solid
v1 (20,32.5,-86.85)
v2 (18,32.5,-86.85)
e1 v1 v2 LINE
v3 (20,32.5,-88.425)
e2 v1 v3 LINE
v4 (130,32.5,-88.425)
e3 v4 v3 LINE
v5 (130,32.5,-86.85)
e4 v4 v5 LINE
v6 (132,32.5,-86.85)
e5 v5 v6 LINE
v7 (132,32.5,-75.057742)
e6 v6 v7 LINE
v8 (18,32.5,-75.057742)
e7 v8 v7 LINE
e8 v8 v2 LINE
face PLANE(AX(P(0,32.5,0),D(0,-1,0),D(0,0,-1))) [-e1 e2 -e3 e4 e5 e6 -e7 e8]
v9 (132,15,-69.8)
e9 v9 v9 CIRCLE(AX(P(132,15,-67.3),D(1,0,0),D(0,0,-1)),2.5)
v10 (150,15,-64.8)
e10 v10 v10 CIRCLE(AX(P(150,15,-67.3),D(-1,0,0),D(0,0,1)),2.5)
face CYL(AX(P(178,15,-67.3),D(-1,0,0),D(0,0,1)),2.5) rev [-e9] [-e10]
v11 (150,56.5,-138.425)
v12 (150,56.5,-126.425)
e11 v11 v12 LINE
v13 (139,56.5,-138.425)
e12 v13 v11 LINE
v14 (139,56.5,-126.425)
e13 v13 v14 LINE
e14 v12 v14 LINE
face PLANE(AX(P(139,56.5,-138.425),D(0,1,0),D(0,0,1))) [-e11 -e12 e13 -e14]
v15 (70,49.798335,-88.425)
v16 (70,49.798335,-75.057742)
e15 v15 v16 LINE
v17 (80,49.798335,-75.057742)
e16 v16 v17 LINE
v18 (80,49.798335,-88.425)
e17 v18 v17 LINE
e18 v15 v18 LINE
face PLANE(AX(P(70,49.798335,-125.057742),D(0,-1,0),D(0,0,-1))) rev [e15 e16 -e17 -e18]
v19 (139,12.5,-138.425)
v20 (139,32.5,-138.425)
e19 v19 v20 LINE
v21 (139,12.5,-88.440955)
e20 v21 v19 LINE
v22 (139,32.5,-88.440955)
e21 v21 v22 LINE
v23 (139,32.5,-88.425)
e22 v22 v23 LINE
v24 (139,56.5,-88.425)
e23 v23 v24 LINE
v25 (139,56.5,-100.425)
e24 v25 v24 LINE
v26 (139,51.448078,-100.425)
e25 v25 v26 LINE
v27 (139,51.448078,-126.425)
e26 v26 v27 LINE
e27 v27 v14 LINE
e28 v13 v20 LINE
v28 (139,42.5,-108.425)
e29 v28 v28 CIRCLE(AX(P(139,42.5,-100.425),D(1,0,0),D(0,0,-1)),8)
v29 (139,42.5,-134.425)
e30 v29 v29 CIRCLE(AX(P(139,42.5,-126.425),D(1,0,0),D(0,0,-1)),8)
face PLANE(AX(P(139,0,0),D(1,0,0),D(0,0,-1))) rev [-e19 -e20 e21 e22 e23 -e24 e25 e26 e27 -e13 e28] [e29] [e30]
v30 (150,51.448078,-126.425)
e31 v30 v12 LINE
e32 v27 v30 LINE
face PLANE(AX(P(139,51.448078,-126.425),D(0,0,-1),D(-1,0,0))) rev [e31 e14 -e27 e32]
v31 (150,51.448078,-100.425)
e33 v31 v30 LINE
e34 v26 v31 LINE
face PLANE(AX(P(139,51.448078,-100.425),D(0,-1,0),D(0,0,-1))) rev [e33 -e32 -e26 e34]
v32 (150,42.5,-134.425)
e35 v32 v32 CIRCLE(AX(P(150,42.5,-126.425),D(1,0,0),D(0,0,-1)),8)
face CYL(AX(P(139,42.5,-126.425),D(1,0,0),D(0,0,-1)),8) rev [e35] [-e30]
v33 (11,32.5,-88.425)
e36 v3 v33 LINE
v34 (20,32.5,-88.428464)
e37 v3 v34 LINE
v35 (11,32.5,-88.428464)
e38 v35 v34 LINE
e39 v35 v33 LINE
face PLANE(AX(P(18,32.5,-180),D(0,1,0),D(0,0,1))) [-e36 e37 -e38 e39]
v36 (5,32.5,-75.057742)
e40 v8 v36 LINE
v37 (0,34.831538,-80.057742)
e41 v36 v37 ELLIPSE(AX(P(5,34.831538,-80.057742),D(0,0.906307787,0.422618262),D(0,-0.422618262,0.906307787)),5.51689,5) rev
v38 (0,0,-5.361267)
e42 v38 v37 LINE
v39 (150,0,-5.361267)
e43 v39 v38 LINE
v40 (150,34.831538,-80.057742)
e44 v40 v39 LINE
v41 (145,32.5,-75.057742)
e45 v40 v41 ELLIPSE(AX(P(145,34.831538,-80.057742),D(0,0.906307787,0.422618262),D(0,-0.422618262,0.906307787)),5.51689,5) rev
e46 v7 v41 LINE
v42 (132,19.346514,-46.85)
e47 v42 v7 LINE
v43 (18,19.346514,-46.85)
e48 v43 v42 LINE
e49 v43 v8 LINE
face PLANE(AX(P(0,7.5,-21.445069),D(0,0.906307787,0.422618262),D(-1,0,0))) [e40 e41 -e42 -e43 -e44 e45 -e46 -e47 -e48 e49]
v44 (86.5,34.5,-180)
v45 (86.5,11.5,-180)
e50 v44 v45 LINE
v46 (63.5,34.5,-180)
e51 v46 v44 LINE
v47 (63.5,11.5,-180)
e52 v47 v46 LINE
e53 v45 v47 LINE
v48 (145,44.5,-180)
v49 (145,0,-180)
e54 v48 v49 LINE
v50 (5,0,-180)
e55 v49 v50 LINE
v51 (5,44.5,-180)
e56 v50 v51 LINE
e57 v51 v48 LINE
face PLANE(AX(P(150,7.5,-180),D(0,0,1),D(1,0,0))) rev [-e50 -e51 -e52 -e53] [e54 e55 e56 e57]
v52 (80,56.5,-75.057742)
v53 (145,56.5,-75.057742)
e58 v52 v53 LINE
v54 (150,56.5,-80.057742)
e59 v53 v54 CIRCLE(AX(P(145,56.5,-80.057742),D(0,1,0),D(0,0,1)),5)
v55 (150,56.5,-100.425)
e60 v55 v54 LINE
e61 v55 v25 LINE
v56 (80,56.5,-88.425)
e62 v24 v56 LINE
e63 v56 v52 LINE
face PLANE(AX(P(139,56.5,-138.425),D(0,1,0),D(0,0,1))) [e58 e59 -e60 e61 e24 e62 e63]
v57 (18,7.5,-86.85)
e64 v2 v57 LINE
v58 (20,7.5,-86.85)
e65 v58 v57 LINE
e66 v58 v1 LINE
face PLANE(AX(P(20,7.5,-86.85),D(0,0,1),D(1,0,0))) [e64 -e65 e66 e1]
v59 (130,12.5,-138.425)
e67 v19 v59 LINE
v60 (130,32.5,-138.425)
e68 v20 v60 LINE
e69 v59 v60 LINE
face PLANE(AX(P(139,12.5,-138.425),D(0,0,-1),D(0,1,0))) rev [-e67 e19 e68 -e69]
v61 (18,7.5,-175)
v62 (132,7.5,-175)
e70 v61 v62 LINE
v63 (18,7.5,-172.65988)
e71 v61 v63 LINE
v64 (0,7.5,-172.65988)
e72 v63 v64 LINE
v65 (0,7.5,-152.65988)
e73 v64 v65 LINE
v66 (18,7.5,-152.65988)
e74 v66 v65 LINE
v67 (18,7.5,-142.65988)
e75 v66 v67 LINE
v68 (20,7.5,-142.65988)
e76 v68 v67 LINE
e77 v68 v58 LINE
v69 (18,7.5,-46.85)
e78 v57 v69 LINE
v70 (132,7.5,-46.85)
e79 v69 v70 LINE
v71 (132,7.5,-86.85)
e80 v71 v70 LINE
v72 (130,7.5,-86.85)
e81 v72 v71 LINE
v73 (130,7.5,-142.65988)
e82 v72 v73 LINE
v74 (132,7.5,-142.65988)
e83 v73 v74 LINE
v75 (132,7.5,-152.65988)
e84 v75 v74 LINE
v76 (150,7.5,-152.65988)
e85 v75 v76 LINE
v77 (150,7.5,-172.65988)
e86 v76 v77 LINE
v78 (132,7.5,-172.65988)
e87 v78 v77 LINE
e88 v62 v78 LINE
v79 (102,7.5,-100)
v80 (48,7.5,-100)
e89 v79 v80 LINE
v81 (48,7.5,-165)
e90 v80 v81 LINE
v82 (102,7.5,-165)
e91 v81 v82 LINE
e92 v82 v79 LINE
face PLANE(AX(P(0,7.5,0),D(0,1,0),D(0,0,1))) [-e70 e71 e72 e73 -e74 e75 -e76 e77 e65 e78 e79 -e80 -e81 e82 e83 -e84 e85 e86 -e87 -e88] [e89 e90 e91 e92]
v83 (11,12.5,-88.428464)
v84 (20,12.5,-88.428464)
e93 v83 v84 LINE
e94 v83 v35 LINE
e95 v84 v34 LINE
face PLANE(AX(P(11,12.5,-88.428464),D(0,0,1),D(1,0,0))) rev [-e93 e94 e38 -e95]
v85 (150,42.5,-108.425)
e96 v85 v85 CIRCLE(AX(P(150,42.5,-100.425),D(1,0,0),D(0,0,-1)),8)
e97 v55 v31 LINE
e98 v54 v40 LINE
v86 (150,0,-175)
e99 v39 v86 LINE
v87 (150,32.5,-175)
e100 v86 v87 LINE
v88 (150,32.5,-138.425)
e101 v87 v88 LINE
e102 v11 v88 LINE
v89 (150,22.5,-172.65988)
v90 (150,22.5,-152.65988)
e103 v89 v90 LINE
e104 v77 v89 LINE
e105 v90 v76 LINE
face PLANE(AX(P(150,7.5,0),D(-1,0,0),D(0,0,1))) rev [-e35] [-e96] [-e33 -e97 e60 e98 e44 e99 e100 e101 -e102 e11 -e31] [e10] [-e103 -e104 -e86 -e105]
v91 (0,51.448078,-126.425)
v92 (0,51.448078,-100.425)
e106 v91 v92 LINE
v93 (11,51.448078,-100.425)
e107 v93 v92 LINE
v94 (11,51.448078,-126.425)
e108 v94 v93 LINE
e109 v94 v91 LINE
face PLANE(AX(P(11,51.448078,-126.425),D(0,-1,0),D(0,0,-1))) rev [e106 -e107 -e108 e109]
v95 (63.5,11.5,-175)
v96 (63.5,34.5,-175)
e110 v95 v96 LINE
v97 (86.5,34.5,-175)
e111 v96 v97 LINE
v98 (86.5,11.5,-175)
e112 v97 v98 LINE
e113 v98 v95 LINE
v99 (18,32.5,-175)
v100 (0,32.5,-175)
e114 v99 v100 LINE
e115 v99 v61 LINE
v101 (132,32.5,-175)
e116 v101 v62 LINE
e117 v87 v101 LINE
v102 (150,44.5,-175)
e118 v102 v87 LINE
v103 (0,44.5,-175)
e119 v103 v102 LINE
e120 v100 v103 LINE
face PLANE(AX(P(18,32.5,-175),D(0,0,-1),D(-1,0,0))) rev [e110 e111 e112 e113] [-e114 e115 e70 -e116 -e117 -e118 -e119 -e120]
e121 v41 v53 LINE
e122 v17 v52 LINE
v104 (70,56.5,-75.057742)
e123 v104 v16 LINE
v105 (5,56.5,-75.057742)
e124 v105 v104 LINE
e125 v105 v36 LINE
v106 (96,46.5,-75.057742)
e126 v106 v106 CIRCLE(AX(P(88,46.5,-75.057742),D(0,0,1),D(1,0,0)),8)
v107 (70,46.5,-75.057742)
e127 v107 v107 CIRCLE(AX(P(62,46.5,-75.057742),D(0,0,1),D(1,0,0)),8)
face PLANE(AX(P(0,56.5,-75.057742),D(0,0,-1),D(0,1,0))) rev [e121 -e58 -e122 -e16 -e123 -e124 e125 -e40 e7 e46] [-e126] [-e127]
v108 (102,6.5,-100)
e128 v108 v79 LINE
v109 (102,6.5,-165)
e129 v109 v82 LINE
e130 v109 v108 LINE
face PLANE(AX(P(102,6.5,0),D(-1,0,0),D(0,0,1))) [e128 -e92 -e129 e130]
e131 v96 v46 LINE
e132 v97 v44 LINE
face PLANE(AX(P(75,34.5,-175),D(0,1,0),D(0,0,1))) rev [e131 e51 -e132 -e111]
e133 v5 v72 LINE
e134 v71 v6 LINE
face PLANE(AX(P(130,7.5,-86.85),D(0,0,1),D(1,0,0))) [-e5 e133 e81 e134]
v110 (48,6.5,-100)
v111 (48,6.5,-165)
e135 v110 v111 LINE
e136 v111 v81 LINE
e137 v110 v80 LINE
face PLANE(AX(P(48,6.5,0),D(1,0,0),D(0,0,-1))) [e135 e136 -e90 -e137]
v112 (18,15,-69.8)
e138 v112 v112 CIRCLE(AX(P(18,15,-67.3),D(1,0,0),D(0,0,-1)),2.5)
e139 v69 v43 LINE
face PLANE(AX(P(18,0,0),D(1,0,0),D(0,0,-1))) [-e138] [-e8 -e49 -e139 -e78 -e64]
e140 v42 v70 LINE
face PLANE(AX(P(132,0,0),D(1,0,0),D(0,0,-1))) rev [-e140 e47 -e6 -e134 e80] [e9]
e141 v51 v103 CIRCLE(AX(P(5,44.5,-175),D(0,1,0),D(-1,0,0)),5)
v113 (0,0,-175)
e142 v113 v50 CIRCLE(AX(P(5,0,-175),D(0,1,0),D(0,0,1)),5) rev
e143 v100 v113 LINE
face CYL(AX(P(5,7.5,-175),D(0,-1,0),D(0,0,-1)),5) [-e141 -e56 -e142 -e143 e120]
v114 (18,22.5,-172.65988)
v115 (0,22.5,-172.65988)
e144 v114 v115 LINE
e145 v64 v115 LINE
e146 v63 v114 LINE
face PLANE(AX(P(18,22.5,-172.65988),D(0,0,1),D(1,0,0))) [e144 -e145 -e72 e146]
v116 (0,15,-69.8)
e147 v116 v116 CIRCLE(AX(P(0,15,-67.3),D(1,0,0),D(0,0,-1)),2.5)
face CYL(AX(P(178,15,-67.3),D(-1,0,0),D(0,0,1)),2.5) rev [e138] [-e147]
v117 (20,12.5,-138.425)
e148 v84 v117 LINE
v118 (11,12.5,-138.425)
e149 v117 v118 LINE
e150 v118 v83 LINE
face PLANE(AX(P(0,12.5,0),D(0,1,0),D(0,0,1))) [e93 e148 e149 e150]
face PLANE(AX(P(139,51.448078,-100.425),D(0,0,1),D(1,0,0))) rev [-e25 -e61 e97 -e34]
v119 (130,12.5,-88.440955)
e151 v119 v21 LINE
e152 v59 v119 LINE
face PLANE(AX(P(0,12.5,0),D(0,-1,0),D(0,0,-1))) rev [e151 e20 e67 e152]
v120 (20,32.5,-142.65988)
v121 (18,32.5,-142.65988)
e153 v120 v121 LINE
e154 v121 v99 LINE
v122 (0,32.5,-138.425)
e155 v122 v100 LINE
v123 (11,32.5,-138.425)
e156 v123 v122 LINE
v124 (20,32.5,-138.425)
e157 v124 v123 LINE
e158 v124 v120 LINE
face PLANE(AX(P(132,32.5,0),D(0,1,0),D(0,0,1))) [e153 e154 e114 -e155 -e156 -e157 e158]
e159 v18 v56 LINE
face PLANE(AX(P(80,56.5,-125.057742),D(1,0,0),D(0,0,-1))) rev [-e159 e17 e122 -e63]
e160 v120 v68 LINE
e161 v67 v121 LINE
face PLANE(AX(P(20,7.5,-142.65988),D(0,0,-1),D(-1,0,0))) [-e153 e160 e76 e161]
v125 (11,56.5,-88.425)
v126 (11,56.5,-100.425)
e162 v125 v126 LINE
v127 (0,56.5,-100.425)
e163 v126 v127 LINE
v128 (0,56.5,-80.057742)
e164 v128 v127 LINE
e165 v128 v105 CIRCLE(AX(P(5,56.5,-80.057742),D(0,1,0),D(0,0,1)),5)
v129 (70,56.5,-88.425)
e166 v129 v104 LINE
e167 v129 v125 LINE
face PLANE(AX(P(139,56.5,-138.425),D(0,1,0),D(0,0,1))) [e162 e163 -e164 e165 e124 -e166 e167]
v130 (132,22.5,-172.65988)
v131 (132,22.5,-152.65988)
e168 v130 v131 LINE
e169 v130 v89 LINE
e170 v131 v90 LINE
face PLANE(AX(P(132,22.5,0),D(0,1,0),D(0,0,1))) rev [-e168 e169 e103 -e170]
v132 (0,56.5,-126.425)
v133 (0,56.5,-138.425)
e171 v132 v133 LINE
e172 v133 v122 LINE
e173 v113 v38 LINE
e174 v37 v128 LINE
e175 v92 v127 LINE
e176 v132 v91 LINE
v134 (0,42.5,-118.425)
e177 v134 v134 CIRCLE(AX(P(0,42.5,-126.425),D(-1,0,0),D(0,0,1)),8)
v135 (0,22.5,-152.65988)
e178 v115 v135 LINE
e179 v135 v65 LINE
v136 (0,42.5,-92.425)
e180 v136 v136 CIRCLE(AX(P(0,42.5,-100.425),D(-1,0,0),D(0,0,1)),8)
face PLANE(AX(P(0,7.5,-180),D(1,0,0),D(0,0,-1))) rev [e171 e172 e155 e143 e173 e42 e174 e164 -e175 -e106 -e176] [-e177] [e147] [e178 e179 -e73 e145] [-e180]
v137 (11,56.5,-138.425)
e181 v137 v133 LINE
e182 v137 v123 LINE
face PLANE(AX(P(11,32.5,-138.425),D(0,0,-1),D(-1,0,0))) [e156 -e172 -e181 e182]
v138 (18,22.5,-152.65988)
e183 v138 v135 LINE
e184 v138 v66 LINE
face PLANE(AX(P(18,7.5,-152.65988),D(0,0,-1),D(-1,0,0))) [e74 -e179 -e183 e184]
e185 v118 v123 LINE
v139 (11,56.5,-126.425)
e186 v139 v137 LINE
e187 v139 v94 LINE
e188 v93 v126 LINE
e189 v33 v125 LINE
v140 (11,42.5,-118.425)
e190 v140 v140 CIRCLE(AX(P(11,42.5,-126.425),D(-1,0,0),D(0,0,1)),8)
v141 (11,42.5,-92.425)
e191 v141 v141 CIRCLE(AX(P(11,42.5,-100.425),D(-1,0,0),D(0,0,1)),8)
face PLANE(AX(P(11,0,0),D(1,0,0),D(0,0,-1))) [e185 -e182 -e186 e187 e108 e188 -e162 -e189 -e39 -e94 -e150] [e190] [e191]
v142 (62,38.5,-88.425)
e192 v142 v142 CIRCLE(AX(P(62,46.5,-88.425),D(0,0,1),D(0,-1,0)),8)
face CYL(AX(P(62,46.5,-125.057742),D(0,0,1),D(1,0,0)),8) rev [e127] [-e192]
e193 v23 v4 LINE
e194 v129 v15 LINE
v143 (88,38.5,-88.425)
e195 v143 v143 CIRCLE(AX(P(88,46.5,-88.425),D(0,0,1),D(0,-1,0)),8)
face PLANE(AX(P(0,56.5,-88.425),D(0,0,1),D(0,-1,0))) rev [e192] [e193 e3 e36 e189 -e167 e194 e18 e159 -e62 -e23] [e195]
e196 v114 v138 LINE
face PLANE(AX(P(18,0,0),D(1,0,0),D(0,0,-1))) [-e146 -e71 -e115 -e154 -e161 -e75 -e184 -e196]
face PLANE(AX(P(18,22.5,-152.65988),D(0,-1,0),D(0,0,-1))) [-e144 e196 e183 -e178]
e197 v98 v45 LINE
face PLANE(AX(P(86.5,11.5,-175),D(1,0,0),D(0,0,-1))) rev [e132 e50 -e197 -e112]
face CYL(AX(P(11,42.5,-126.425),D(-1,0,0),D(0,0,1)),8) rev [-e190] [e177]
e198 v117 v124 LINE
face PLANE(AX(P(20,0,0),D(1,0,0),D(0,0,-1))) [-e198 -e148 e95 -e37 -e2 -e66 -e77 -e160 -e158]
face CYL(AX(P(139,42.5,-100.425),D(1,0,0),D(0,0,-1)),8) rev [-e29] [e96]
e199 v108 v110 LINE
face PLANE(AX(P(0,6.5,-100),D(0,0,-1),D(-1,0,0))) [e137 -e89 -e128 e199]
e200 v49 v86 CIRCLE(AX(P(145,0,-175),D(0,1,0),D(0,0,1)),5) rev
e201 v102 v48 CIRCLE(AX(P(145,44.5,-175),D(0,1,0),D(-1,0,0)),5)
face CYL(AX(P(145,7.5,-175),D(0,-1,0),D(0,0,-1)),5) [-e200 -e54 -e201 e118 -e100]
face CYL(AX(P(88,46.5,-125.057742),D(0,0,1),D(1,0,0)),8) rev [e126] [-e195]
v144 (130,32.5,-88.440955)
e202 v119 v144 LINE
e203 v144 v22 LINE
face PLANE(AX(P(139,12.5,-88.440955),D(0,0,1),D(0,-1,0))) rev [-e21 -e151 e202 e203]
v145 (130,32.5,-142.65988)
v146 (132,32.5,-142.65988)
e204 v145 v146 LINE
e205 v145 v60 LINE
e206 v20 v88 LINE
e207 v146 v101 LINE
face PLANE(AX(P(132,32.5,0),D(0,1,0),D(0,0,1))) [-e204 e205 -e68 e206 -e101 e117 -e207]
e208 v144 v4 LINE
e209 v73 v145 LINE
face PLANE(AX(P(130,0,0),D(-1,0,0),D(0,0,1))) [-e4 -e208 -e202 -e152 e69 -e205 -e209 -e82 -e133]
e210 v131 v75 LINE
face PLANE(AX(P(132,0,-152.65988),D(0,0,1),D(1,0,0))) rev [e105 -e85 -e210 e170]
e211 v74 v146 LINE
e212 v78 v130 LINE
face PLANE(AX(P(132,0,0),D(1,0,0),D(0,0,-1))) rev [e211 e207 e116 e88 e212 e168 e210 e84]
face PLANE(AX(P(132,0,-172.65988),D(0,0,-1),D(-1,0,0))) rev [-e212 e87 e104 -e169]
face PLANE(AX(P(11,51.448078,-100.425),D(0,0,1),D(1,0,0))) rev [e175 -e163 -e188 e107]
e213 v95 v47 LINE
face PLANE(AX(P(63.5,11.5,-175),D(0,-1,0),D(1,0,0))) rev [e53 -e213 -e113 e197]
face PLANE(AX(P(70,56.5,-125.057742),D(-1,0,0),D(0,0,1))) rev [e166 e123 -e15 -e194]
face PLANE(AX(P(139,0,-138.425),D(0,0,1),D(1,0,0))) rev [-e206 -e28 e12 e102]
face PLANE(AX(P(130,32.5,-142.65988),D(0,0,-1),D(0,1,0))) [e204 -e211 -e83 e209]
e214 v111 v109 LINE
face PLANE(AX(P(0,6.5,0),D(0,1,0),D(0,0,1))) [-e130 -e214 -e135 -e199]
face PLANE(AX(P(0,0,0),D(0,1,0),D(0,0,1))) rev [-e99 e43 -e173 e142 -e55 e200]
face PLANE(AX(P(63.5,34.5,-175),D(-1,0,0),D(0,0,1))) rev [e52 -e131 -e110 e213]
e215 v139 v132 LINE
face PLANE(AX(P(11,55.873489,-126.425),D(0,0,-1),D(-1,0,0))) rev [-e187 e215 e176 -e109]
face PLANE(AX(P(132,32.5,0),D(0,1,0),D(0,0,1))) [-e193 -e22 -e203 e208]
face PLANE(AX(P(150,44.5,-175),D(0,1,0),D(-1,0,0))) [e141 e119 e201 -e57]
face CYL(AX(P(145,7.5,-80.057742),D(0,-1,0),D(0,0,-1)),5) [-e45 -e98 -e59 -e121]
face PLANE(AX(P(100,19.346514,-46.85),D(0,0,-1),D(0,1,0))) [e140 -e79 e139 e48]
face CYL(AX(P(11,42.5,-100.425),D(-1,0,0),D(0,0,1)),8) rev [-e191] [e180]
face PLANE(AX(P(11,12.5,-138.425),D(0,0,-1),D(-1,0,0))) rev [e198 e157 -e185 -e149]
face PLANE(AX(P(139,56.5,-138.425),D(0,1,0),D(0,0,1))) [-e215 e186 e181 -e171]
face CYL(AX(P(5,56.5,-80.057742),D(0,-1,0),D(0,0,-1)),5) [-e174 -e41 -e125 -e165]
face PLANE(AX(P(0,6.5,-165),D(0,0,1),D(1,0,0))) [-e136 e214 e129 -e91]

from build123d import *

# Parameters (mm, degrees)
SKETCH1_W                = 150
SKETCH1_H                = 180
BOSS_EXTRUDE2_DEPTH      = 7.5
BOSS_EXTRUDE4_DEPTH      = 18
BOSS_EXTRUDE5_DEPTH      = 18
SKETCH6_W                = 20
SKETCH6_H                = 15
BOSS_EXTRUDE7_DEPTH      = 18
BOSS_EXTRUDE8_DEPTH      = 22
BOSS_EXTRUDE8_DEPTH_BACK = 172
SKETCH7_R                = 2.5
SKETCH8_W                = 20
SKETCH8_H                = 15
BOSS_EXTRUDE9_DEPTH      = 18
SKETCH9_W                = 55.809879822
SKETCH9_H                = 25
BOSS_EXTRUDE10_DEPTH     = 20
SKETCH10_W               = 55.809879822
SKETCH10_H               = 25
BOSS_EXTRUDE11_DEPTH     = 20
CHAMFER2_SIZE            = 10
CHAMFER2_SIZE_2          = 21.445069205
SKETCH12_R               = 8
BOSS_EXTRUDE12_DEPTH     = 11
SKETCH13_W               = 50
SKETCH13_H               = 2
BOSS_EXTRUDE13_DEPTH     = 11
SKETCH14_W               = 26
SKETCH14_H               = 4.425411463
CUT_EXTRUDE1_DEPTH       = 11
SKETCH15_W               = 9
SKETCH15_H               = 49.984045424
CUT_EXTRUDE2_DEPTH       = 20
BOSS_EXTRUDE14_START     = -11
SKETCH16_W               = 50
SKETCH16_H               = 24
SKETCH16_R               = 8
SKETCH16_W_2             = 26
SKETCH16_H_2             = 4.425411463
BOSS_EXTRUDE14_DEPTH     = 11
SKETCH17_W               = 9
SKETCH17_H               = 49.996535525
CUT_EXTRUDE3_DEPTH       = 20
SKETCH20_W               = 114
SKETCH20_H               = 5
BOSS_EXTRUDE15_DEPTH     = 25
CUT_EXTRUDE4_DEPTH       = 1
CUT_EXTRUDE5_DEPTH       = 20
BOSS_EXTRUDE16_DEPTH     = 50
CUT_EXTRUDE6_DEPTH       = 50
BOSS_EXTRUDE17_DEPTH     = 50
SKETCH27_W               = 150
SKETCH27_H               = 12
BOSS_EXTRUDE18_DEPTH     = 5
CUT_EXTRUDE7_DEPTH       = 5
SKETCH29_W               = 150
SKETCH29_H               = 13.367257782
BOSS_EXTRUDE19_DEPTH     = 24
SKETCH30_W               = 50
SKETCH30_H               = 25.404930795
BOSS_EXTRUDE20_DEPTH     = 12
CUT_EXTRUDE10_DEPTH      = 50
SKETCH32_R               = 8
CUT_EXTRUDE13_DEPTH      = 50
SKETCH33_W               = 10
SKETCH33_H               = 6.701665097
CUT_EXTRUDE14_DEPTH      = 50
FILLET1_R                = 5
FILLET2_R                = 5
FILLET3_R                = 5
FILLET4_R                = 5
CUT_EXTRUDE15_START      = -200
SKETCH34_R               = 2.5
CUT_EXTRUDE15_DEPTH      = 200
CUT_EXTRUDE16_DEPTH      = 200
CUT_EXTRUDE17_DEPTH      = 200


with BuildPart() as part:
    # Sketch1 → Boss-Extrude2 (new body)
    with BuildSketch(Plane(origin=(0, 0, 0), x_dir=(1, 0, 0), z_dir=(0, 1, 0))):
        with Locations((75, 90)):
            Rectangle(SKETCH1_W, SKETCH1_H)
    extrude(amount=BOSS_EXTRUDE2_DEPTH)

    # Sketch2 → Boss-Extrude4 (add)
    with BuildSketch(Plane(origin=(150, 0, 0), x_dir=(0, 0, -1), z_dir=(1, 0, 0))):
        Polygon((76.85, 7.5), (86.85, 7.5), (86.85, 32.5), (46.85, 32.5), (46.85, 7.5), (50, 7.5), (56.85, 7.5), (56.85, 22.5), (76.85, 22.5), align=None)
        Polygon((172.659879822, 7.5), (180, 7.5), (180, 32.5), (142.659879822, 32.5), (142.659879822, 7.5), (152.659879822, 7.5), (152.659879822, 22.5), (172.659879822, 22.5), align=None)
    extrude(amount=-BOSS_EXTRUDE4_DEPTH)

    # Sketch4 → Boss-Extrude5 (add)
    with BuildSketch(Plane.ZY):
        Polygon((-180, 7.5), (-180, 32.5), (-142.659879822, 32.5), (-142.659879822, 7.5), (-152.659879822, 7.5), (-152.659879822, 22.5), (-172.659879822, 22.5), (-172.659879822, 7.5), align=None)
        Polygon((-86.85, 7.5), (-86.85, 32.5), (-46.85, 32.5), (-46.85, 7.5), (-56.85, 7.5), (-56.85, 22.5), (-76.85, 22.5), (-76.85, 7.5), align=None)
    extrude(amount=-BOSS_EXTRUDE5_DEPTH)

    # Sketch6 → Boss-Extrude7 (add)
    with BuildSketch(Plane(origin=(150, 0, 0), x_dir=(0, 0, -1), z_dir=(1, 0, 0))):
        with Locations((66.85, 15)):
            Rectangle(SKETCH6_W, SKETCH6_H)
    extrude(amount=-BOSS_EXTRUDE7_DEPTH)

    # Sketch7 → Boss-Extrude8 (add, two sides: drawn at the far end of the back side and taken through both)
    with BuildSketch(Plane(origin=(150, 0, 0), x_dir=(0, 0, -1), z_dir=(1, 0, 0)).offset(-BOSS_EXTRUDE8_DEPTH_BACK)):
        with Locations((67.3, 15)):
            Circle(SKETCH7_R)
    extrude(amount=BOSS_EXTRUDE8_DEPTH + BOSS_EXTRUDE8_DEPTH_BACK)

    # Sketch8 → Boss-Extrude9 (add)
    with BuildSketch(Plane.ZY):
        with Locations((-66.85, 15)):
            Rectangle(SKETCH8_W, SKETCH8_H)
    extrude(amount=-BOSS_EXTRUDE9_DEPTH)

    # Sketch9 → Boss-Extrude10 (add)
    with BuildSketch(Plane(origin=(150, 0, 0), x_dir=(0, 0, -1), z_dir=(1, 0, 0))):
        with Locations((114.754939911, 20)):
            Rectangle(SKETCH9_W, SKETCH9_H)
    extrude(amount=-BOSS_EXTRUDE10_DEPTH)

    # Sketch10 → Boss-Extrude11 (add)
    with BuildSketch(Plane.ZY):
        with Locations((-114.754939911, 20)):
            Rectangle(SKETCH10_W, SKETCH10_H)
    extrude(amount=-BOSS_EXTRUDE11_DEPTH)

    # Chamfer2
    # the kernel refuses this chamfer: 21.445069205, 10 mm, written as the material it takes off along each edge
    with BuildSketch(Plane(origin=(-55.563648293, 7.5, 0), x_dir=(0, -0.9971975577536774, 0.07481330637060031), z_dir=(1, 0, 0))) as chamfer2_piece_1:
        Polygon((CHAMFER2_SIZE * 0.997197557754, CHAMFER2_SIZE * 0.0748133063706), (-CHAMFER2_SIZE_2 * 0.0748133063709, CHAMFER2_SIZE_2 * 0.997197557758), (0, 0), align=None)
    extrude(amount=261.127296587, mode=Mode.SUBTRACT)

    # Sketch12 → Boss-Extrude12 (add)
    with BuildSketch(Plane(origin=(150, 0, 0), x_dir=(0, 0, -1), z_dir=(1, 0, 0))):
        Polygon((100.425, 32.5), (113.425, 32.5), (126.425, 32.5), (138.425, 32.5), (138.425, 42.5), (138.425, 54.5), (88.425, 54.5), (88.425, 42.5), (88.425, 32.5), align=None)
        with Locations((100.425, 42.5)):
            Circle(SKETCH12_R, mode=Mode.SUBTRACT)
        with Locations((126.425, 42.5)):
            Circle(SKETCH12_R, mode=Mode.SUBTRACT)
    extrude(amount=-BOSS_EXTRUDE12_DEPTH)

    # Sketch13 → Boss-Extrude13 (add)
    with BuildSketch(Plane(origin=(150, 0, 0), x_dir=(0, 0, -1), z_dir=(1, 0, 0))):
        with Locations((113.425, 55.5)):
            Rectangle(SKETCH13_W, SKETCH13_H)
    extrude(amount=-BOSS_EXTRUDE13_DEPTH)

    # Sketch14 → Cut-Extrude1 (cut)
    with BuildSketch(Plane(origin=(150, 0, 0), x_dir=(0, 0, -1), z_dir=(1, 0, 0))):
        with Locations((113.425, 53.660783617)):
            Rectangle(SKETCH14_W, SKETCH14_H)
    extrude(amount=-CUT_EXTRUDE1_DEPTH, mode=Mode.SUBTRACT)

    # Sketch15 → Cut-Extrude2 (cut)
    with BuildSketch(Plane(origin=(0, 32.5, 0), x_dir=(1, 0, 0), z_dir=(0, 1, 0))):
        with Locations((134.5, 113.432977288)):
            Rectangle(SKETCH15_W, SKETCH15_H)
    extrude(amount=-CUT_EXTRUDE2_DEPTH, mode=Mode.SUBTRACT)

    # Sketch16 → Boss-Extrude14 (add)
    with BuildSketch(Plane.ZY.offset(BOSS_EXTRUDE14_START)):
        with Locations((-113.425, 44.5)):
            Rectangle(SKETCH16_W, SKETCH16_H)
        with Locations(Location((-126.425, 42.5, 0), (0, 0, 180))):
            Circle(SKETCH16_R, mode=Mode.SUBTRACT)
        with Locations(Location((-100.425, 42.5, 0), (0, 0, 180))):
            Circle(SKETCH16_R, mode=Mode.SUBTRACT)
        with Locations((-113.425, 53.660783617)):
            Rectangle(SKETCH16_W_2, SKETCH16_H_2, mode=Mode.SUBTRACT)
    extrude(amount=BOSS_EXTRUDE14_DEPTH)

    # Sketch17 → Cut-Extrude3 (cut)
    with BuildSketch(Plane(origin=(0, 32.5, 0), x_dir=(1, 0, 0), z_dir=(0, 1, 0))):
        with Locations((15.5, 113.426732238)):
            Rectangle(SKETCH17_W, SKETCH17_H)
    extrude(amount=-CUT_EXTRUDE3_DEPTH, mode=Mode.SUBTRACT)

    # Sketch20 → Boss-Extrude15 (add)
    with BuildSketch(Plane(origin=(0, 7.5, 0), x_dir=(1, 0, 0), z_dir=(0, 1, 0))):
        with Locations((75, 177.5)):
            Rectangle(SKETCH20_W, SKETCH20_H)
    extrude(amount=BOSS_EXTRUDE15_DEPTH)

    # Sketch21 → Cut-Extrude4 (cut)
    with BuildSketch(Plane(origin=(0, 7.5, 0), x_dir=(1, 0, 0), z_dir=(0, 1, 0))):
        Polygon((48, 165), (75, 165), (102, 165), (102, 100), (48, 100), align=None)
    extrude(amount=-CUT_EXTRUDE4_DEPTH, mode=Mode.SUBTRACT)

    # Sketch22 → Cut-Extrude5 (cut)
    with BuildSketch(Plane(origin=(150, 0, 0), x_dir=(0, 0, -1), z_dir=(1, 0, 0))):
        Polygon((21.445069205, 7.5), (46.85, 19.346513785), (75.057742218, 32.5), (21.445069205, 32.5), align=None)
    extrude(amount=-CUT_EXTRUDE5_DEPTH, mode=Mode.SUBTRACT)

    # Sketch23 → Boss-Extrude16 (add)
    with BuildSketch(Plane(origin=(150, 0, 0), x_dir=(0, 0, -1), z_dir=(1, 0, 0))):
        Polygon((21.445069205, 7.5), (46.85, 19.346513785), (46.85, 7.5), align=None)
    extrude(amount=-BOSS_EXTRUDE16_DEPTH)

    # Sketch24 → Cut-Extrude6 (cut)
    with BuildSketch(Plane.ZY):
        Polygon((-21.445069205, 7.5), (-75.057742218, 32.5), (-21.445069205, 32.5), align=None)
    extrude(amount=-CUT_EXTRUDE6_DEPTH, mode=Mode.SUBTRACT)

    # Sketch25 → Boss-Extrude17 (add)
    with BuildSketch(Plane.ZY):
        Polygon((-46.85, 19.346513785), (-46.85, 7.5), (-21.445069205, 7.5), align=None)
    extrude(amount=-BOSS_EXTRUDE17_DEPTH)

    # Sketch27 → Boss-Extrude18 (add)
    with BuildSketch(Plane(origin=(0, 0, -180), x_dir=(-1, 0, 0), z_dir=(0, 0, -1))):
        with Locations((-75, 38.5)):
            Rectangle(SKETCH27_W, SKETCH27_H)
    extrude(amount=-BOSS_EXTRUDE18_DEPTH)

    # Sketch28 → Cut-Extrude7 (cut)
    with BuildSketch(Plane(origin=(0, 0, -180), x_dir=(-1, 0, 0), z_dir=(0, 0, -1))):
        Polygon((-75, 34.5), (-63.5, 34.5), (-63.5, 11.5), (-86.5, 11.5), (-86.5, 34.5), align=None)
    extrude(amount=-CUT_EXTRUDE7_DEPTH, mode=Mode.SUBTRACT)

    # Sketch29 → Boss-Extrude19 (add)
    with BuildSketch(Plane(origin=(0, 32.5, 0), x_dir=(1, 0, 0), z_dir=(0, 1, 0))):
        with Locations((75, 81.741371109)):
            Rectangle(SKETCH29_W, SKETCH29_H)
    extrude(amount=BOSS_EXTRUDE19_DEPTH)

    # Sketch30 → Boss-Extrude20 (add)
    with BuildSketch(Plane(origin=(0, 7.5, 0), x_dir=(1, 0, 0), z_dir=(0, 1, 0))):
        with Locations((75, 34.147534603)):
            Rectangle(SKETCH30_W, SKETCH30_H)
    extrude(amount=BOSS_EXTRUDE20_DEPTH)

    # Sketch31 → Cut-Extrude10 (cut)
    with BuildSketch(Plane(origin=(100, 0, 0), x_dir=(0, 0, -1), z_dir=(1, 0, 0))):
        Polygon((48.364168982, 20.052582377), (21.328861381, 20.052582377), (21.445069205, 7.5), align=None)
    extrude(amount=-CUT_EXTRUDE10_DEPTH, mode=Mode.SUBTRACT)

    # Sketch32 → Cut-Extrude13 (cut)
    with BuildSketch(Plane.XY.offset(-75.057742218)):
        with Locations((62, 46.5)):
            Circle(SKETCH32_R)
        with Locations((88, 46.5)):
            Circle(SKETCH32_R)
    extrude(amount=-CUT_EXTRUDE13_DEPTH, mode=Mode.SUBTRACT)

    # Sketch33 → Cut-Extrude14 (cut)
    with BuildSketch(Plane.XY.offset(-75.057742218)):
        with Locations((75, 53.149167452)):
            Rectangle(SKETCH33_W, SKETCH33_H)
    extrude(amount=-CUT_EXTRUDE14_DEPTH, mode=Mode.SUBTRACT)

    # Fillet1
    fillet1_edges = [part.edges().sort_by_distance(p)[0] for p in [
        (0, 44.5, -75.057742218),
    ]]
    fillet(fillet1_edges, radius=FILLET1_R)

    # Fillet2
    fillet2_edges = [part.edges().sort_by_distance(p)[0] for p in [
        (150, 44.5, -75.057742218),
    ]]
    fillet(fillet2_edges, radius=FILLET2_R)

    # Fillet3
    fillet3_edges = [part.edges().sort_by_distance(p)[0] for p in [
        (150, 22.25, -180),
    ]]
    fillet(fillet3_edges, radius=FILLET3_R)

    # Fillet4
    fillet4_edges = [part.edges().sort_by_distance(p)[0] for p in [
        (0, 22.25, -180),
    ]]
    fillet(fillet4_edges, radius=FILLET4_R)

    # Sketch34 → Cut-Extrude15 (cut)
    with BuildSketch(Plane.ZY.offset(22).offset(CUT_EXTRUDE15_START)):
        with Locations(Location((-67.3, 15, 0), (0, 0, 180))):
            Circle(SKETCH34_R)
    extrude(amount=CUT_EXTRUDE15_DEPTH, mode=Mode.SUBTRACT)

    # Sketch35 → Cut-Extrude16 (cut)
    with BuildSketch(Plane.ZY):
        Polygon((-126.425, 55.873489348), (-126.425, 56.5), (-100.505365538, 56.5), (-100.425, 55.873489348), align=None)
    extrude(amount=-CUT_EXTRUDE16_DEPTH, mode=Mode.SUBTRACT)

    # Sketch36 → Cut-Extrude17 (cut)
    with BuildSketch(Plane.ZY):
        Polygon((-100.425, 55.873489348), (-100.425, 56.5), (-100.505365538, 56.5), align=None)
    extrude(amount=-CUT_EXTRUDE17_DEPTH, mode=Mode.SUBTRACT)


solid = part.part
